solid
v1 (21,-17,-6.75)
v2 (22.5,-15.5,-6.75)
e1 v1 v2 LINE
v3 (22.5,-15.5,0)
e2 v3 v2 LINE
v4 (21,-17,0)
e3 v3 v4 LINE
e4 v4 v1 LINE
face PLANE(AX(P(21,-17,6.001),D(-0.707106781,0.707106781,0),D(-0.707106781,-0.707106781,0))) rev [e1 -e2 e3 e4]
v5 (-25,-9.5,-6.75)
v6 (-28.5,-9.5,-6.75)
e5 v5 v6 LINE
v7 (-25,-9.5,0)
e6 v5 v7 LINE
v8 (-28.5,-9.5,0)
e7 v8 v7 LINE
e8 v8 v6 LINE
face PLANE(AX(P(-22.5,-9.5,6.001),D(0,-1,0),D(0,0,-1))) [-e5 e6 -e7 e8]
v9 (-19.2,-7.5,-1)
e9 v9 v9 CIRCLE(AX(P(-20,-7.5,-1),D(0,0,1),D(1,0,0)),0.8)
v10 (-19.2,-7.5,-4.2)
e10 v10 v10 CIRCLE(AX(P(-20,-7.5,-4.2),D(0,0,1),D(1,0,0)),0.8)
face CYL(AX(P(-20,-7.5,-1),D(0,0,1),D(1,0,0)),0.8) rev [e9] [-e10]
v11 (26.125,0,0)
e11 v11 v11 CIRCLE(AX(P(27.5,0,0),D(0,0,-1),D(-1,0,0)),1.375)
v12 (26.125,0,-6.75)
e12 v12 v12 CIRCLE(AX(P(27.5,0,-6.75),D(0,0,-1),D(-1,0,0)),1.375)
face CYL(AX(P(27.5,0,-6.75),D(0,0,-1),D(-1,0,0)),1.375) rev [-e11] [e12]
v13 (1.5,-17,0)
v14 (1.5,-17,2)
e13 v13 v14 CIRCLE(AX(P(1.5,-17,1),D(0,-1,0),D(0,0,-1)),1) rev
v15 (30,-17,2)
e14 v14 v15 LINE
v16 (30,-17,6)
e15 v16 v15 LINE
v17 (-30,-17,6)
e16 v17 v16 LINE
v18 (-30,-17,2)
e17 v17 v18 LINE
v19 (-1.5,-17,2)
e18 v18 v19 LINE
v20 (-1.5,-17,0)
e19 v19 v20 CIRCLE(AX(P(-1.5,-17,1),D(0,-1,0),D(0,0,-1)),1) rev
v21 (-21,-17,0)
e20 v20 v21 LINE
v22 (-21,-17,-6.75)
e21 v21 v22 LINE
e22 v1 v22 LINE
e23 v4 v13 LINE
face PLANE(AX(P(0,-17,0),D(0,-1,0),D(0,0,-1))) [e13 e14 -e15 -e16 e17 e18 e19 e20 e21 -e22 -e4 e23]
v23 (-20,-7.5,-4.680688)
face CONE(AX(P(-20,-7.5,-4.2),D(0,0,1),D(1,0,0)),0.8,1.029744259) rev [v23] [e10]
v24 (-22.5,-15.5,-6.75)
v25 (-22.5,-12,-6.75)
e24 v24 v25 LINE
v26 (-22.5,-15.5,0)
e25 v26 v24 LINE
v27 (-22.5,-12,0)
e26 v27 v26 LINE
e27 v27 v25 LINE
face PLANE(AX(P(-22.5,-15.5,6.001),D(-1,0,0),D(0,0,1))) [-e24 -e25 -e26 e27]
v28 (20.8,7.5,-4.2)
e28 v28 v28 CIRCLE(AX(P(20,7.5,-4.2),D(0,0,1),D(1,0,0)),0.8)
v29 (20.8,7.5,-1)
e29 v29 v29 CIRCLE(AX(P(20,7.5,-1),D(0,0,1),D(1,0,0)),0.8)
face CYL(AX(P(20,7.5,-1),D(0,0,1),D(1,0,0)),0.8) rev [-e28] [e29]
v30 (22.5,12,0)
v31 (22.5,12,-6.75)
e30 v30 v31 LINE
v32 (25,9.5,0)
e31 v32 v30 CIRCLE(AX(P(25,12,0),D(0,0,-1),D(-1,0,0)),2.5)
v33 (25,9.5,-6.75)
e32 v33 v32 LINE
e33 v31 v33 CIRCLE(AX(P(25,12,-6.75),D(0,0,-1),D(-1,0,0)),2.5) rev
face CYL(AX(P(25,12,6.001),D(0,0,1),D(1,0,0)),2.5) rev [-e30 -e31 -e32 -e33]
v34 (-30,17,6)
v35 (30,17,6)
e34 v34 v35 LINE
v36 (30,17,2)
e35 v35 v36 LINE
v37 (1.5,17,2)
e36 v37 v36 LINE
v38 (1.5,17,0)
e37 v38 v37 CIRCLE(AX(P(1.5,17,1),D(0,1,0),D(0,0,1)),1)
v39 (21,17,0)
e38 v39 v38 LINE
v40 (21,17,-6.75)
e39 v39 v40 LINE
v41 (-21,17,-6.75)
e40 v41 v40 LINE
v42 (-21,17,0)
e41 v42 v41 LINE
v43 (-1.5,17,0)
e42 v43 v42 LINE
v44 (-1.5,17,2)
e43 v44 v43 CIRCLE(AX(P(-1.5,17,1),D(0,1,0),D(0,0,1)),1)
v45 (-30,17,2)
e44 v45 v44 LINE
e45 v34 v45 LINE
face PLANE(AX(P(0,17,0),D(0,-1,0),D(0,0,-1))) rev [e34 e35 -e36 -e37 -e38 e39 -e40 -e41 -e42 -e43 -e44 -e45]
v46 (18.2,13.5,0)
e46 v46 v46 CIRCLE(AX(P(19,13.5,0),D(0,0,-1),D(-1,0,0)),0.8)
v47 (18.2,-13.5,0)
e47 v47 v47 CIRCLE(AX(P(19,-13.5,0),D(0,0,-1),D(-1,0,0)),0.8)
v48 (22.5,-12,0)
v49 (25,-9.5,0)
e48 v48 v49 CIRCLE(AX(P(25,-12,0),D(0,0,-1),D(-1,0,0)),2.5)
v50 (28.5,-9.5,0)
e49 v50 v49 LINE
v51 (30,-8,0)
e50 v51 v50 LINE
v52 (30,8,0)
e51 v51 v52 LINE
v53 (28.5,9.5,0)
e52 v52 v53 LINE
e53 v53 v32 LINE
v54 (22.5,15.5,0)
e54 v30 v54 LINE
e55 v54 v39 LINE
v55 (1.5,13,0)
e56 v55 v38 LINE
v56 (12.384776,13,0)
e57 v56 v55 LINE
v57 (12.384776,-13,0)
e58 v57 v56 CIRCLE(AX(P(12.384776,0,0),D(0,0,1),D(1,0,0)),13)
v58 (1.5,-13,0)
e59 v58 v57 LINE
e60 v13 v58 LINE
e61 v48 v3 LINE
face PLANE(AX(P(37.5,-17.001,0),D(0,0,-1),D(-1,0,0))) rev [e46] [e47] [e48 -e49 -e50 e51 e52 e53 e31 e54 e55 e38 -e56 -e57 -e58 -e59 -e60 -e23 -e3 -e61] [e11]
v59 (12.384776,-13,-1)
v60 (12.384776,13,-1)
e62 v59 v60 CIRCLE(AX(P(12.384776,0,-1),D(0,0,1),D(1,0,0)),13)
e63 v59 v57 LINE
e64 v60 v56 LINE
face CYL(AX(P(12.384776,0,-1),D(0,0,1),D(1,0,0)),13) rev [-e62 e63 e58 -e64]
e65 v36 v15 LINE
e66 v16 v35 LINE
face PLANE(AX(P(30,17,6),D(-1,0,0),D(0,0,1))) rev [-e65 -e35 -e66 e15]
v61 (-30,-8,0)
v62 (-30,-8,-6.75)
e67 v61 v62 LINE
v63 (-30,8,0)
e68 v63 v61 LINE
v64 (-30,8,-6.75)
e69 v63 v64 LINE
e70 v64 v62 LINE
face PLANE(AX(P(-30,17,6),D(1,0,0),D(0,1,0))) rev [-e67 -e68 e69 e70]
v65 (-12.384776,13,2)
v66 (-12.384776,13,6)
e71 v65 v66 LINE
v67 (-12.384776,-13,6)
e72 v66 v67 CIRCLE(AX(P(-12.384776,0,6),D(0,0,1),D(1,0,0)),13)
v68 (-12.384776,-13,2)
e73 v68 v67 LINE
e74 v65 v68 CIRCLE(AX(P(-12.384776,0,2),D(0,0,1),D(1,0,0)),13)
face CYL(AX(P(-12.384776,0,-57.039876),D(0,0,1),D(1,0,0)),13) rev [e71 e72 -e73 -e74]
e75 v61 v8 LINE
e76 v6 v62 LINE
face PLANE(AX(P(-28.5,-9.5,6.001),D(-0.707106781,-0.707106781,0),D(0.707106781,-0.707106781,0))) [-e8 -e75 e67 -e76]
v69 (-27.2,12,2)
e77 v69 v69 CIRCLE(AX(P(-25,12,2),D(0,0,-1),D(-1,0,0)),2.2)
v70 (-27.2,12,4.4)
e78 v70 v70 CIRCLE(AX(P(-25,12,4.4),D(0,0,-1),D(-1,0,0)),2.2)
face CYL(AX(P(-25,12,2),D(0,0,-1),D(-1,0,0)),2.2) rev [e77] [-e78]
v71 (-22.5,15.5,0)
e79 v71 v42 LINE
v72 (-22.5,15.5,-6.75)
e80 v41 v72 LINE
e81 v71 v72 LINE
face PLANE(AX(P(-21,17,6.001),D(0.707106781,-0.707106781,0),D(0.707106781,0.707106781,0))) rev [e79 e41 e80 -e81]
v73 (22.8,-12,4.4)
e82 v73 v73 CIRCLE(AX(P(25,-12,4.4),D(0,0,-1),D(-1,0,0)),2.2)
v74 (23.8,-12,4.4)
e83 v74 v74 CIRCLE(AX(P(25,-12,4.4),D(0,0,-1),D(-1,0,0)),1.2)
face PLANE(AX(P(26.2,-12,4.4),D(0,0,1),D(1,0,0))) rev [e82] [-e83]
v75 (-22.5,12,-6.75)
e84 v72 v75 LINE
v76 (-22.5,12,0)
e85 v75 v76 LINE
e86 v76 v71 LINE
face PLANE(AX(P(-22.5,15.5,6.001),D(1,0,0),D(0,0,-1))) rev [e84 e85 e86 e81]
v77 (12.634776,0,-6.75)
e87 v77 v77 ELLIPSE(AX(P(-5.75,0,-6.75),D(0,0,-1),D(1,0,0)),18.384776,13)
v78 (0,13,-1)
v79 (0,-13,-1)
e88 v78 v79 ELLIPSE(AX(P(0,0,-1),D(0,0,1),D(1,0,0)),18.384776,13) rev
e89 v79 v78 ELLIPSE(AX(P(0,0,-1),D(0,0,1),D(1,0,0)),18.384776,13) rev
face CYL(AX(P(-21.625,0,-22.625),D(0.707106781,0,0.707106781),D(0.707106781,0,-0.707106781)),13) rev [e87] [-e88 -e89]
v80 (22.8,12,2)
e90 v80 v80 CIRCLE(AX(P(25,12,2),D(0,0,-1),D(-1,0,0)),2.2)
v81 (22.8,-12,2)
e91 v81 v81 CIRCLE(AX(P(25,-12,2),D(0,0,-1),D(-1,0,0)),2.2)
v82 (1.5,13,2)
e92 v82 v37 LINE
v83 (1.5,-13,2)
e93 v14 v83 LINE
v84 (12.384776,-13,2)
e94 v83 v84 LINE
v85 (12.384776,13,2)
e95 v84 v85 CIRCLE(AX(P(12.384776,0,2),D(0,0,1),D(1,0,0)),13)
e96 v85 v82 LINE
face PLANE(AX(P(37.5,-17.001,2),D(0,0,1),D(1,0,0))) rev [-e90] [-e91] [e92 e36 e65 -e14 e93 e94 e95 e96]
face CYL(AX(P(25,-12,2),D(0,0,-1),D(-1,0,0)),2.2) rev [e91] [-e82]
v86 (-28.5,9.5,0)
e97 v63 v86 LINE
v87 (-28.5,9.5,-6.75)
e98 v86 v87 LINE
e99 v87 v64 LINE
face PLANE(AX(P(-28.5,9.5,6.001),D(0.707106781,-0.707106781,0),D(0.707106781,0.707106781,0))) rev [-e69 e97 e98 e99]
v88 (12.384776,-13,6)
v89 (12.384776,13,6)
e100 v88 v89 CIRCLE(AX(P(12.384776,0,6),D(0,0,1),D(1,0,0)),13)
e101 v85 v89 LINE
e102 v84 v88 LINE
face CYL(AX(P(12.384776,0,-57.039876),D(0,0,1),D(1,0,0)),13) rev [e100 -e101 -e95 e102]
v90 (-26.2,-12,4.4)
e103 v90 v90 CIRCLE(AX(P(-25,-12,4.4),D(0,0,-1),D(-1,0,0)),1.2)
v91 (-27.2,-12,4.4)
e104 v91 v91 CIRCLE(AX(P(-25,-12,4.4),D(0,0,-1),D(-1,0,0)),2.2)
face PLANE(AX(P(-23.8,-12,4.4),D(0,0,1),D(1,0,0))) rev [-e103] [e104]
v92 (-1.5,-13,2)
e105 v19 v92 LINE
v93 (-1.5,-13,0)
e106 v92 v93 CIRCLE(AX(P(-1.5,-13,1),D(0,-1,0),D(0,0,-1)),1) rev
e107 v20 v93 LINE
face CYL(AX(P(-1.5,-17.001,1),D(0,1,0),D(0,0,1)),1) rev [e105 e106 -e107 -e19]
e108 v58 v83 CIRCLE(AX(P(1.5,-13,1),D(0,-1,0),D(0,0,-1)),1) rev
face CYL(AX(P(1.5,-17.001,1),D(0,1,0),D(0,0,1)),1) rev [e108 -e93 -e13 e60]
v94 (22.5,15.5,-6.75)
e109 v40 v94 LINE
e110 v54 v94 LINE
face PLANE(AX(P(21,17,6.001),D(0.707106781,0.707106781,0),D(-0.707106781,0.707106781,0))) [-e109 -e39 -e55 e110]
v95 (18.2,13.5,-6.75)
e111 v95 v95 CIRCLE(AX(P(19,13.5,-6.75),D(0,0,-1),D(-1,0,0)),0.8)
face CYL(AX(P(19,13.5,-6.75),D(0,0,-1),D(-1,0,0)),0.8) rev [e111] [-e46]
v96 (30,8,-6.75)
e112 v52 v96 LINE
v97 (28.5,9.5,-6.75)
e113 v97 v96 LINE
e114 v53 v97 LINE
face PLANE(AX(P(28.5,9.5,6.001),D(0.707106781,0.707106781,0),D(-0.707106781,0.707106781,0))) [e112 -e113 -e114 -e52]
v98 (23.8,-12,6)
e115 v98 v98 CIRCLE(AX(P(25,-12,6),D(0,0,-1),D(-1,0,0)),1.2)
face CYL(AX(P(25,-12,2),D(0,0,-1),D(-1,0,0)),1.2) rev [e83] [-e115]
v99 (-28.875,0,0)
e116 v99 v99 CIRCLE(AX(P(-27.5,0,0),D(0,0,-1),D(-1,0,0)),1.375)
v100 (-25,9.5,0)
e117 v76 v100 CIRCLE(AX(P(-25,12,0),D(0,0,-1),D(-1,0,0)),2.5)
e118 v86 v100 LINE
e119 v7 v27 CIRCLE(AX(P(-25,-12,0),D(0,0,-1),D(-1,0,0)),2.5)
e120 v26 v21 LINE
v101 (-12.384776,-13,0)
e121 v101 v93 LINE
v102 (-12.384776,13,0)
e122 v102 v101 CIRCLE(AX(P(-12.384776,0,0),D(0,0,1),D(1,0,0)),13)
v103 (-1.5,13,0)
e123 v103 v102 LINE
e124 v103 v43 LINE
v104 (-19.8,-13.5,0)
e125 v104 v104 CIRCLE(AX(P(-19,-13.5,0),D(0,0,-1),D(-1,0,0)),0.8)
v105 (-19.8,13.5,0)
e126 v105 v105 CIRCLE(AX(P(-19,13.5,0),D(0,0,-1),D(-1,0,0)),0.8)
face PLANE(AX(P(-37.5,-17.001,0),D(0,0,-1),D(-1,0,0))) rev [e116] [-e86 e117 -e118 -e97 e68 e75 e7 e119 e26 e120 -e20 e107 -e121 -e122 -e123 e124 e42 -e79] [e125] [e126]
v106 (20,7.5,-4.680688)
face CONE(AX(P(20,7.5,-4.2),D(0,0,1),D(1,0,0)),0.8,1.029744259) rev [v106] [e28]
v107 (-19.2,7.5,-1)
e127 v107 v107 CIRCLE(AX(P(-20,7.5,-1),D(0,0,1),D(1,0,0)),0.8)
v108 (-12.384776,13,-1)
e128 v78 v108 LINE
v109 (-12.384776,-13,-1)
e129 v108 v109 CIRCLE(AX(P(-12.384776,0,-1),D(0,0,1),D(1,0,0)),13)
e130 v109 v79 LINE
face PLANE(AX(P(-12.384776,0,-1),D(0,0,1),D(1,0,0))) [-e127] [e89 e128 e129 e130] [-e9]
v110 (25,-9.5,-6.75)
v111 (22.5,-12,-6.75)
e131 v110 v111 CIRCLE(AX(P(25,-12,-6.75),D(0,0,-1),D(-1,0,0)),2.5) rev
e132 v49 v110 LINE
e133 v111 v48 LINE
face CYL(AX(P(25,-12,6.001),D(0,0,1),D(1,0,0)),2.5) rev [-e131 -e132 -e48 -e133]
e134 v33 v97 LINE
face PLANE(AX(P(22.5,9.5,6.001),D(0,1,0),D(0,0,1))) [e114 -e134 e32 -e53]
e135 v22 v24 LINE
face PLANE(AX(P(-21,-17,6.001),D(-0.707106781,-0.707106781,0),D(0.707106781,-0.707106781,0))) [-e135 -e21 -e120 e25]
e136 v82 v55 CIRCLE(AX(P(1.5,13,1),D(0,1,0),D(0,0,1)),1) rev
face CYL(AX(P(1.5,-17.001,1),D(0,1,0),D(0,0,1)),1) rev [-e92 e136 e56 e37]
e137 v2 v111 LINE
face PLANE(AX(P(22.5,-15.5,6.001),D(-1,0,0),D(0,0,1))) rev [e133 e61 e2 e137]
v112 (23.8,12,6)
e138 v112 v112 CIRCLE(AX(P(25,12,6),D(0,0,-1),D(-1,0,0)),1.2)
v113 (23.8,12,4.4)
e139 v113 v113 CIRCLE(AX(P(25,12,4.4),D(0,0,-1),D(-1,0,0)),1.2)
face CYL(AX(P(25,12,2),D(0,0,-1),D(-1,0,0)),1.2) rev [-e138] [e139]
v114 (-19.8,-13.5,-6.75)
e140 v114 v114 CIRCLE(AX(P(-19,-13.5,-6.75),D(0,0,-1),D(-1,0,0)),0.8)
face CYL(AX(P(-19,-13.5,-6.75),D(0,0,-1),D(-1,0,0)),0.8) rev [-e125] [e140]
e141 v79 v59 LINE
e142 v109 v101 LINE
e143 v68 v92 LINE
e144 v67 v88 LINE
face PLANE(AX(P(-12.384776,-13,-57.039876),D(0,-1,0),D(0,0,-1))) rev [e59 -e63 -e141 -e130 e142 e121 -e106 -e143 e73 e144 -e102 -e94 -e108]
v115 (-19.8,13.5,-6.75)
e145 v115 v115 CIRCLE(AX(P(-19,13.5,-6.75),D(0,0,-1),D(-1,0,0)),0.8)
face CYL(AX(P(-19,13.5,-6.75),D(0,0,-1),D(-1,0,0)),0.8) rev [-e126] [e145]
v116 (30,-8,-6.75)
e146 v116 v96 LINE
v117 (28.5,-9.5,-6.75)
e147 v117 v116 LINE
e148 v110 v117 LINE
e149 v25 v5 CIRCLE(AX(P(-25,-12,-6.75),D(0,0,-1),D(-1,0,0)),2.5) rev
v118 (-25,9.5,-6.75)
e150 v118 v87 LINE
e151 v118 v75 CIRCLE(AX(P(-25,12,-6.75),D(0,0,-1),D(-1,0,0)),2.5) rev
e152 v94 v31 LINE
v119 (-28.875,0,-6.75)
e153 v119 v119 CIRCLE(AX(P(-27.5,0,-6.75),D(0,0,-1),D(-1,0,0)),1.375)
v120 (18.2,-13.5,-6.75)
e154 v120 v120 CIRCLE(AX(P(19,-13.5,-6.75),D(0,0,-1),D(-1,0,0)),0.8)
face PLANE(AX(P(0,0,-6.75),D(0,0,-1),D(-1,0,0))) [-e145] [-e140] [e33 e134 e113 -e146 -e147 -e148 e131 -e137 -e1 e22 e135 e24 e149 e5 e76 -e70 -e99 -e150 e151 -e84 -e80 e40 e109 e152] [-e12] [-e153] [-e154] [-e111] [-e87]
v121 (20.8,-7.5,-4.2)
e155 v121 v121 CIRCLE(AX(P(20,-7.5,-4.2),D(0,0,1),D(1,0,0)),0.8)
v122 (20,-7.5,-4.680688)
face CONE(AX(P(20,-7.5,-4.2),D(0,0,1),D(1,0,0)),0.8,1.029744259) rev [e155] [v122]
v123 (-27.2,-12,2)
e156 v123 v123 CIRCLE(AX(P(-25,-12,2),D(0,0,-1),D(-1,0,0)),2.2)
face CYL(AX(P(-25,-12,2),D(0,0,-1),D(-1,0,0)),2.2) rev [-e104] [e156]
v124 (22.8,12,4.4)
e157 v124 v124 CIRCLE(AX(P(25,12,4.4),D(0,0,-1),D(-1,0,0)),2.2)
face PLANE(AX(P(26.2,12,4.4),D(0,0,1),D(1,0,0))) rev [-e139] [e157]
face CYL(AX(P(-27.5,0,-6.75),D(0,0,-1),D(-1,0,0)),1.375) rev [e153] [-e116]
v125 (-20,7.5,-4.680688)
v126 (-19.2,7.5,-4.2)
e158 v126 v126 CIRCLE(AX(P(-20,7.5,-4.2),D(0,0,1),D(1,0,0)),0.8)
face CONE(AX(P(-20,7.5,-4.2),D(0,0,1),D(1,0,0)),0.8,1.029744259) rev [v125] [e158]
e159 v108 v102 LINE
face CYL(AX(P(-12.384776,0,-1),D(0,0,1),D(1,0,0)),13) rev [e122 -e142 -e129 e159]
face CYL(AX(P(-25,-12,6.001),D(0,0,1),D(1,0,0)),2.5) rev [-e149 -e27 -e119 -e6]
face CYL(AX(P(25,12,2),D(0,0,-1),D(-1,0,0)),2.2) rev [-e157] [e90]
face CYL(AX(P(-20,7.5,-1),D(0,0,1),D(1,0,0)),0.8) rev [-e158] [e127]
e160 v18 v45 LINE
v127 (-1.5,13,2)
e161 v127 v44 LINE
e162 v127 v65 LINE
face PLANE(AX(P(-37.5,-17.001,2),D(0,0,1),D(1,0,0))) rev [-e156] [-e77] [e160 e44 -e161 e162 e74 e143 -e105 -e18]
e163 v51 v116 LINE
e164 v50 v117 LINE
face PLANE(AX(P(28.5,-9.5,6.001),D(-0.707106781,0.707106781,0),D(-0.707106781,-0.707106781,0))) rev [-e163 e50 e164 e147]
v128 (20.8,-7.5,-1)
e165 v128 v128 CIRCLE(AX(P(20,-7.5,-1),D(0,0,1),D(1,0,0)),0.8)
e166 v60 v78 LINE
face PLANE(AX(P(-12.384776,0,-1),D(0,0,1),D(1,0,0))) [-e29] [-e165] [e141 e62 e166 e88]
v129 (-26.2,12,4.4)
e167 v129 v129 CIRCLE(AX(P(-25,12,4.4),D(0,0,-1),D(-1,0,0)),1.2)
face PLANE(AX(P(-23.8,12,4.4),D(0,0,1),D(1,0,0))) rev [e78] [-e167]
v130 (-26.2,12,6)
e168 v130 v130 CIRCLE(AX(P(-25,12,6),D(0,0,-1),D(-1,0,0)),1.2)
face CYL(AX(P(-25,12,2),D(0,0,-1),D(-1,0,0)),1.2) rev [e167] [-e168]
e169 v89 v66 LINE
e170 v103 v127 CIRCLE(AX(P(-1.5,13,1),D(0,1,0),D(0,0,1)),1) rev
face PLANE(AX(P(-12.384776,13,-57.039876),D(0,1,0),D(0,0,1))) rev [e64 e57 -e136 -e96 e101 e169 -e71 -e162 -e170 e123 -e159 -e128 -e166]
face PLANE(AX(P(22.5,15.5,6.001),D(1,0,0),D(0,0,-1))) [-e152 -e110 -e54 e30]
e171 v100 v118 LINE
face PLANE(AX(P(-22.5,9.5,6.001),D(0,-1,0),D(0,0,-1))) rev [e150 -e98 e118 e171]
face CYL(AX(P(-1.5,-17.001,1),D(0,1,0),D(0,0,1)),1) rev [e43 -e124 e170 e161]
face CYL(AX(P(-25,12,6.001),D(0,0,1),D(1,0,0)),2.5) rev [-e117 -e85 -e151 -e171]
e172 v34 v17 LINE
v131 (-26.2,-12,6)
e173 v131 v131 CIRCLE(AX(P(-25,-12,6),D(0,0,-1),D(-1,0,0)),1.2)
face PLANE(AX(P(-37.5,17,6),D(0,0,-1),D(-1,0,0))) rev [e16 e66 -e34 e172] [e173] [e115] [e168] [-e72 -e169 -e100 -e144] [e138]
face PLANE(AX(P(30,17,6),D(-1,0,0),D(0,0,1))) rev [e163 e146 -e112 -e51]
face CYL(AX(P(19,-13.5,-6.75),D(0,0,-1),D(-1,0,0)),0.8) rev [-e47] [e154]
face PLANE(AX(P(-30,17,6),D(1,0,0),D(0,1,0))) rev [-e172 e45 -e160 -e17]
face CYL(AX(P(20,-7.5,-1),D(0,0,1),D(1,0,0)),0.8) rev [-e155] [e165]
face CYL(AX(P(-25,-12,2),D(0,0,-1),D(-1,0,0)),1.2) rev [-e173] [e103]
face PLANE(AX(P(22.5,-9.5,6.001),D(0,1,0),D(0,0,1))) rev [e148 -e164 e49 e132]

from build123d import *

# Parameters (mm, degrees)
SKETCH1_W                                    = 75
SKETCH1_H                                    = 12
BOSS_EXTRUDE1_DEPTH                          = 17
CUT_EXTRUDE1_REACH                           = 52.973
CUT_EXTRUDE2_DEPTH                           = 1
CUT_EXTRUDE2_DEPTH_BACK                      = 1
SKETCH5_W                                    = 4
SKETCH5_H                                    = 10
SKETCH22_W                                   = 75
SKETCH22_H                                   = 34
BOSS_EXTRUDE2_DEPTH                          = 0.75
CUT_EXTRUDE3_DEPTH                           = 65.057103431
CUT_EXTRUDE3_DEPTH_BACK                      = 65.057103431
SKETCH4_R                                    = 13
CUT_EXTRUDE4_START                           = -6
CUT_EXTRUDE4_DEPTH                           = 6
SKETCH7_W                                    = 7.5
SKETCH7_H                                    = 34
CUT_EXTRUDE5_DEPTH                           = 44.102349124
CBORE_FOR_M2_HEX_SOCKET_HEAD_CAP_SCR_2_COUNT = 2
CBORE_FOR_M2_HEX_SOCKET_HEAD_CAP_SCR_2_PITCH = 50
CBORE_FOR_M2_HEX_SOCKET_HEAD_CAP_SCR_3_COUNT = 2
CBORE_FOR_M2_HEX_SOCKET_HEAD_CAP_SCR_3_PITCH = 55.461698495
CBORE_FOR_M2_HEX_SOCKET_HEAD_CAP_SCR_4_COUNT = 2
CBORE_FOR_M2_HEX_SOCKET_HEAD_CAP_SCR_4_PITCH = 24
CUT_EXTRUDE8_REACH                           = 38.764
FILLET1_R                                    = 2.5
CIRPATTERN1_COUNT                            = 2
FILLET1_OF_CIRPATTERN1_R                     = 2.5
MIRROR1_START                                = -6.75
MIRROR1_DEPTH                                = 6.75
CUT_EXTRUDE11_START                          = -1
CUT_EXTRUDE11_DEPTH                          = 1
M2_TAPPED_HOLE1_D                            = 1.6
M2_TAPPED_HOLE1_DEPTH                        = 3.2
M2_TAPPED_HOLE1_TIP                          = 0.480688495
M2_TAPPED_HOLE2_D                            = 1.6
M2_TAPPED_HOLE2_DEPTH                        = 6.75
M3X0_25_TAPPED_HOLE1_D                       = 2.75
M3X0_25_TAPPED_HOLE1_DEPTH                   = 6.75


# Read off the part's stored shape, not the designer's step: Mirror1
with BuildPart() as part:
    # Sketch1 → Boss-Extrude1 (new, symmetric)
    with BuildSketch(Plane(origin=(0, 0, 0), x_dir=(1, 0, 0), z_dir=(0, 1, 0))):
        Rectangle(SKETCH1_W, SKETCH1_H)
    extrude(amount=BOSS_EXTRUDE1_DEPTH, both=True)

    # Sketch2 → Cut-Extrude1 (cut, up to next)
    with BuildSketch(Plane(origin=(0, 17, 0), x_dir=(1, 0, 0), z_dir=(0, 1, 0)), mode=Mode.PRIVATE) as cut_extrude1_sk1:
        with BuildLine():
            Line((-37.5, 0), (-1.5, 0))
            ThreePointArc((-1.5, 0), (-0.5, -1), (-1.5, -2))
            Line((-1.5, -2), (-37.5, -2))
            ThreePointArc((-37.5, -2), (-38.5, -1), (-37.5, 0))
        make_face()
    cut_extrude1_tool1 = extrude(cut_extrude1_sk1.sketch, amount=-CUT_EXTRUDE1_REACH, mode=Mode.PRIVATE) & part.part
    # Sketch2 → Cut-Extrude1 (cut, up to next)
    with BuildSketch(Plane(origin=(0, 17, 0), x_dir=(1, 0, 0), z_dir=(0, 1, 0)), mode=Mode.PRIVATE) as cut_extrude1_sk2:
        with BuildLine():
            Line((37.5, -2), (1.5, -2))
            ThreePointArc((1.5, -2), (0.5, -1), (1.5, 0))
            Line((1.5, 0), (37.5, 0))
            ThreePointArc((37.5, 0), (38.5, -1), (37.5, -2))
        make_face()
    cut_extrude1_tool2 = extrude(cut_extrude1_sk2.sketch, amount=-CUT_EXTRUDE1_REACH, mode=Mode.PRIVATE) & part.part
    add(cut_extrude1_tool1.solids().sort_by_distance((-19.5, 17, 1))[0], mode=Mode.SUBTRACT)
    add(cut_extrude1_tool2.solids().sort_by_distance((19.5, 17, 1))[0], mode=Mode.SUBTRACT)

    # Sketch5 → Cut-Extrude2 (cut, two sides: drawn at the far end of the back side and taken through both)
    with BuildSketch(Plane(origin=(0, 0, 0), x_dir=(0, 0, -1), z_dir=(1, 0, 0)).offset(-CUT_EXTRUDE2_DEPTH_BACK)):
        with Locations((-1, 0)):
            Rectangle(SKETCH5_W, SKETCH5_H)
    extrude(amount=CUT_EXTRUDE2_DEPTH + CUT_EXTRUDE2_DEPTH_BACK, mode=Mode.SUBTRACT)

    # Sketch22 → Boss-Extrude2 (add)
    with BuildSketch(Plane(origin=(0, 0, -6), x_dir=(-1, 0, 0), z_dir=(0, 0, -1))):
        Rectangle(SKETCH22_W, SKETCH22_H)
    extrude(amount=BOSS_EXTRUDE2_DEPTH)

    # Sketch4 → Cut-Extrude3 (cut, two sides: drawn at the far end of the back side and taken through both)
    with BuildSketch(Plane(origin=(18.75, 0, 18.75), x_dir=(0, 1, 0), z_dir=(0.7071067811865488, 0, 0.7071067811865464)).offset(-CUT_EXTRUDE3_DEPTH_BACK)):
        with Locations(Location((0, -0.707106781, 0), (0, 0, 270))):
            Circle(SKETCH4_R)
    extrude(amount=CUT_EXTRUDE3_DEPTH + CUT_EXTRUDE3_DEPTH_BACK, mode=Mode.SUBTRACT)

    # Sketch6 → Cut-Extrude4 (cut)
    with BuildSketch(Plane.XY.offset(6).offset(CUT_EXTRUDE4_START)):
        with BuildLine():
            Line((-12.384776311, 13), (12.384776311, 13))
            ThreePointArc((12.384776311, 13), (25.384776311, 0), (12.384776311, -13))
            Line((12.384776311, -13), (-12.384776311, -13))
            ThreePointArc((-12.384776311, -13), (-25.384776311, 0), (-12.384776311, 13))
        make_face()
    extrude(amount=CUT_EXTRUDE4_DEPTH, mode=Mode.SUBTRACT)

    # Sketch7 → Cut-Extrude5 (cut, through all)
    with BuildSketch(Plane(origin=(0, 0, -6.75), x_dir=(-1, 0, 0), z_dir=(0, 0, -1))):
        with Locations((33.75, 0)):
            Rectangle(SKETCH7_W, SKETCH7_H)
        with Locations((-33.75, 0)):
            Rectangle(SKETCH7_W, SKETCH7_H)
    extrude(amount=-CUT_EXTRUDE5_DEPTH, mode=Mode.SUBTRACT)

    # Sketch13 → CBORE for M2 Hex Socket Head Cap Screw1 (revolve, cut)
    with BuildSketch(Plane(origin=(-25, 12, 2), x_dir=(0, 1, 0), z_dir=(1, 0, 0))):
        Polygon((0, 0), (0, 4), (1.2, 4), (1.2, 2.4), (2.2, 2.4), (2.2, 0), align=None)
    cbore_for_m2_hex_socket_head_cap_screw1 = revolve(axis=Axis((-25, 12, -4.35), (0, 0, 1)), mode=Mode.SUBTRACT)

    # CBORE for M2 Hex Socket Head Cap Scr 2: CBORE for M2 Hex Socket Head Cap Screw1 ×2
    with Locations(*[(i * CBORE_FOR_M2_HEX_SOCKET_HEAD_CAP_SCR_2_PITCH, 0, 0) for i in range(1, CBORE_FOR_M2_HEX_SOCKET_HEAD_CAP_SCR_2_COUNT)]):
        add(cbore_for_m2_hex_socket_head_cap_screw1, mode=Mode.SUBTRACT)

    # CBORE for M2 Hex Socket Head Cap Scr 3: CBORE for M2 Hex Socket Head Cap Screw1 ×2
    with Locations(*[Vector(0.9015230574682735, -0.43273106758477137, 0) * (i * CBORE_FOR_M2_HEX_SOCKET_HEAD_CAP_SCR_3_PITCH) for i in range(1, CBORE_FOR_M2_HEX_SOCKET_HEAD_CAP_SCR_3_COUNT)]):
        add(cbore_for_m2_hex_socket_head_cap_screw1, mode=Mode.SUBTRACT)

    # CBORE for M2 Hex Socket Head Cap Scr 4: CBORE for M2 Hex Socket Head Cap Screw1 ×2
    with Locations(*[(0, -i * CBORE_FOR_M2_HEX_SOCKET_HEAD_CAP_SCR_4_PITCH, 0) for i in range(1, CBORE_FOR_M2_HEX_SOCKET_HEAD_CAP_SCR_4_COUNT)]):
        add(cbore_for_m2_hex_socket_head_cap_screw1, mode=Mode.SUBTRACT)

    # Sketch15 → Cut-Extrude8 (cut, up to next)
    with BuildSketch(Plane(origin=(0, 0, -6.75), x_dir=(-1, 0, 0), z_dir=(0, 0, -1)), mode=Mode.PRIVATE) as cut_extrude8_sk1:
        Polygon((30, 17), (21, 17), (22.5, 15.5), (22.5, 9.5), (28.5, 9.5), (30, 8), align=None)
    cut_extrude8_tool1 = extrude(cut_extrude8_sk1.sketch, amount=-CUT_EXTRUDE8_REACH, mode=Mode.PRIVATE) & part.part
    cut_extrude8 = cut_extrude8_tool1.solids().sort_by_distance((-26.230769, 13.230769, -6.75))[0]
    add(cut_extrude8, mode=Mode.SUBTRACT)

    # Fillet1
    fillet1_edges = [part.edges().sort_by_distance(p)[0] for p in [
        (-22.5, 9.5, -3.375),
    ]]
    fillet(fillet1_edges, radius=FILLET1_R)

    # CirPattern1: Cut-Extrude8 ×2 about axis
    cirpattern1_axis = Axis((0, 0, 0), (0, 0, 1))
    for i in range(1, CIRPATTERN1_COUNT):
        add(cut_extrude8.rotate(cirpattern1_axis, i * 360 / CIRPATTERN1_COUNT), mode=Mode.SUBTRACT)

    # Fillet1 of CirPattern1
    fillet1_of_cirpattern1_edges = [part.edges().sort_by_distance(p)[0] for p in [
        (22.5, -9.5, -3.375),
    ]]
    fillet(fillet1_of_cirpattern1_edges, radius=FILLET1_OF_CIRPATTERN1_R)

    # Mirror1 outline → Mirror1 (cut)
    with BuildSketch(Plane.XY.offset(MIRROR1_START)):
        with BuildLine():
            Line((25, 9.5), (28.5, 9.5))
            Line((28.5, 9.5), (30, 8))
            Line((30, 8), (30, 17))
            Line((30, 17), (21, 17))
            Line((21, 17), (22.5, 15.5))
            Line((22.5, 15.5), (22.5, 12))
            ThreePointArc((22.5, 12), (23.232233047, 10.232233047), (25, 9.5))
        make_face()
        with BuildLine():
            Line((-22.5, -15.5), (-22.5, -12))
            ThreePointArc((-22.5, -12), (-23.232233047, -10.232233047), (-25, -9.5))
            Line((-25, -9.5), (-28.5, -9.5))
            Line((-28.5, -9.5), (-30, -8))
            Line((-30, -8), (-30, -17))
            Line((-30, -17), (-21, -17))
            Line((-21, -17), (-22.5, -15.5))
        make_face()
    extrude(amount=MIRROR1_DEPTH, mode=Mode.SUBTRACT)

    # Sketch20 → Cut-Extrude11 (cut)
    with BuildSketch(Plane.XY.offset(CUT_EXTRUDE11_START)):
        with BuildLine():
            Line((-12.384776311, -13), (12.384776311, -13))
            ThreePointArc((12.384776311, -13), (25.384776311, 0), (12.384776311, 13))
            Line((12.384776311, 13), (-12.384776311, 13))
            ThreePointArc((-12.384776311, 13), (-25.384776311, 0), (-12.384776311, -13))
        make_face()
    extrude(amount=CUT_EXTRUDE11_DEPTH, mode=Mode.SUBTRACT)

    # M2 Tapped Hole1
    with Locations(Plane.XY.offset(-1)):
        with Locations((20, 7.5), (-20, -7.5), (-20, 7.5), (20, -7.5)):
            Hole(M2_TAPPED_HOLE1_D / 2, depth=M2_TAPPED_HOLE1_DEPTH)
            with Locations((0, 0, -(M2_TAPPED_HOLE1_DEPTH + M2_TAPPED_HOLE1_TIP / 2))):  # 118° drill point
                Cone(0, M2_TAPPED_HOLE1_D / 2, M2_TAPPED_HOLE1_TIP, mode=Mode.SUBTRACT)

    # M2 Tapped Hole2
    with Locations(Plane(origin=(0, 0, -6.75), x_dir=(-1, 0, 0), z_dir=(0, 0, -1))):
        with Locations((19, 13.5), (-19, -13.5), (-19, 13.5), (19, -13.5)):
            Hole(M2_TAPPED_HOLE2_D / 2, depth=M2_TAPPED_HOLE2_DEPTH)

    # M3x0.25 Tapped Hole1
    with Locations(Plane(origin=(0, 0, -6.75), x_dir=(-1, 0, 0), z_dir=(0, 0, -1))):
        with Locations((-27.5, 0), (27.5, 0)):
            Hole(M3X0_25_TAPPED_HOLE1_D / 2, depth=M3X0_25_TAPPED_HOLE1_DEPTH)


solid = part.part
